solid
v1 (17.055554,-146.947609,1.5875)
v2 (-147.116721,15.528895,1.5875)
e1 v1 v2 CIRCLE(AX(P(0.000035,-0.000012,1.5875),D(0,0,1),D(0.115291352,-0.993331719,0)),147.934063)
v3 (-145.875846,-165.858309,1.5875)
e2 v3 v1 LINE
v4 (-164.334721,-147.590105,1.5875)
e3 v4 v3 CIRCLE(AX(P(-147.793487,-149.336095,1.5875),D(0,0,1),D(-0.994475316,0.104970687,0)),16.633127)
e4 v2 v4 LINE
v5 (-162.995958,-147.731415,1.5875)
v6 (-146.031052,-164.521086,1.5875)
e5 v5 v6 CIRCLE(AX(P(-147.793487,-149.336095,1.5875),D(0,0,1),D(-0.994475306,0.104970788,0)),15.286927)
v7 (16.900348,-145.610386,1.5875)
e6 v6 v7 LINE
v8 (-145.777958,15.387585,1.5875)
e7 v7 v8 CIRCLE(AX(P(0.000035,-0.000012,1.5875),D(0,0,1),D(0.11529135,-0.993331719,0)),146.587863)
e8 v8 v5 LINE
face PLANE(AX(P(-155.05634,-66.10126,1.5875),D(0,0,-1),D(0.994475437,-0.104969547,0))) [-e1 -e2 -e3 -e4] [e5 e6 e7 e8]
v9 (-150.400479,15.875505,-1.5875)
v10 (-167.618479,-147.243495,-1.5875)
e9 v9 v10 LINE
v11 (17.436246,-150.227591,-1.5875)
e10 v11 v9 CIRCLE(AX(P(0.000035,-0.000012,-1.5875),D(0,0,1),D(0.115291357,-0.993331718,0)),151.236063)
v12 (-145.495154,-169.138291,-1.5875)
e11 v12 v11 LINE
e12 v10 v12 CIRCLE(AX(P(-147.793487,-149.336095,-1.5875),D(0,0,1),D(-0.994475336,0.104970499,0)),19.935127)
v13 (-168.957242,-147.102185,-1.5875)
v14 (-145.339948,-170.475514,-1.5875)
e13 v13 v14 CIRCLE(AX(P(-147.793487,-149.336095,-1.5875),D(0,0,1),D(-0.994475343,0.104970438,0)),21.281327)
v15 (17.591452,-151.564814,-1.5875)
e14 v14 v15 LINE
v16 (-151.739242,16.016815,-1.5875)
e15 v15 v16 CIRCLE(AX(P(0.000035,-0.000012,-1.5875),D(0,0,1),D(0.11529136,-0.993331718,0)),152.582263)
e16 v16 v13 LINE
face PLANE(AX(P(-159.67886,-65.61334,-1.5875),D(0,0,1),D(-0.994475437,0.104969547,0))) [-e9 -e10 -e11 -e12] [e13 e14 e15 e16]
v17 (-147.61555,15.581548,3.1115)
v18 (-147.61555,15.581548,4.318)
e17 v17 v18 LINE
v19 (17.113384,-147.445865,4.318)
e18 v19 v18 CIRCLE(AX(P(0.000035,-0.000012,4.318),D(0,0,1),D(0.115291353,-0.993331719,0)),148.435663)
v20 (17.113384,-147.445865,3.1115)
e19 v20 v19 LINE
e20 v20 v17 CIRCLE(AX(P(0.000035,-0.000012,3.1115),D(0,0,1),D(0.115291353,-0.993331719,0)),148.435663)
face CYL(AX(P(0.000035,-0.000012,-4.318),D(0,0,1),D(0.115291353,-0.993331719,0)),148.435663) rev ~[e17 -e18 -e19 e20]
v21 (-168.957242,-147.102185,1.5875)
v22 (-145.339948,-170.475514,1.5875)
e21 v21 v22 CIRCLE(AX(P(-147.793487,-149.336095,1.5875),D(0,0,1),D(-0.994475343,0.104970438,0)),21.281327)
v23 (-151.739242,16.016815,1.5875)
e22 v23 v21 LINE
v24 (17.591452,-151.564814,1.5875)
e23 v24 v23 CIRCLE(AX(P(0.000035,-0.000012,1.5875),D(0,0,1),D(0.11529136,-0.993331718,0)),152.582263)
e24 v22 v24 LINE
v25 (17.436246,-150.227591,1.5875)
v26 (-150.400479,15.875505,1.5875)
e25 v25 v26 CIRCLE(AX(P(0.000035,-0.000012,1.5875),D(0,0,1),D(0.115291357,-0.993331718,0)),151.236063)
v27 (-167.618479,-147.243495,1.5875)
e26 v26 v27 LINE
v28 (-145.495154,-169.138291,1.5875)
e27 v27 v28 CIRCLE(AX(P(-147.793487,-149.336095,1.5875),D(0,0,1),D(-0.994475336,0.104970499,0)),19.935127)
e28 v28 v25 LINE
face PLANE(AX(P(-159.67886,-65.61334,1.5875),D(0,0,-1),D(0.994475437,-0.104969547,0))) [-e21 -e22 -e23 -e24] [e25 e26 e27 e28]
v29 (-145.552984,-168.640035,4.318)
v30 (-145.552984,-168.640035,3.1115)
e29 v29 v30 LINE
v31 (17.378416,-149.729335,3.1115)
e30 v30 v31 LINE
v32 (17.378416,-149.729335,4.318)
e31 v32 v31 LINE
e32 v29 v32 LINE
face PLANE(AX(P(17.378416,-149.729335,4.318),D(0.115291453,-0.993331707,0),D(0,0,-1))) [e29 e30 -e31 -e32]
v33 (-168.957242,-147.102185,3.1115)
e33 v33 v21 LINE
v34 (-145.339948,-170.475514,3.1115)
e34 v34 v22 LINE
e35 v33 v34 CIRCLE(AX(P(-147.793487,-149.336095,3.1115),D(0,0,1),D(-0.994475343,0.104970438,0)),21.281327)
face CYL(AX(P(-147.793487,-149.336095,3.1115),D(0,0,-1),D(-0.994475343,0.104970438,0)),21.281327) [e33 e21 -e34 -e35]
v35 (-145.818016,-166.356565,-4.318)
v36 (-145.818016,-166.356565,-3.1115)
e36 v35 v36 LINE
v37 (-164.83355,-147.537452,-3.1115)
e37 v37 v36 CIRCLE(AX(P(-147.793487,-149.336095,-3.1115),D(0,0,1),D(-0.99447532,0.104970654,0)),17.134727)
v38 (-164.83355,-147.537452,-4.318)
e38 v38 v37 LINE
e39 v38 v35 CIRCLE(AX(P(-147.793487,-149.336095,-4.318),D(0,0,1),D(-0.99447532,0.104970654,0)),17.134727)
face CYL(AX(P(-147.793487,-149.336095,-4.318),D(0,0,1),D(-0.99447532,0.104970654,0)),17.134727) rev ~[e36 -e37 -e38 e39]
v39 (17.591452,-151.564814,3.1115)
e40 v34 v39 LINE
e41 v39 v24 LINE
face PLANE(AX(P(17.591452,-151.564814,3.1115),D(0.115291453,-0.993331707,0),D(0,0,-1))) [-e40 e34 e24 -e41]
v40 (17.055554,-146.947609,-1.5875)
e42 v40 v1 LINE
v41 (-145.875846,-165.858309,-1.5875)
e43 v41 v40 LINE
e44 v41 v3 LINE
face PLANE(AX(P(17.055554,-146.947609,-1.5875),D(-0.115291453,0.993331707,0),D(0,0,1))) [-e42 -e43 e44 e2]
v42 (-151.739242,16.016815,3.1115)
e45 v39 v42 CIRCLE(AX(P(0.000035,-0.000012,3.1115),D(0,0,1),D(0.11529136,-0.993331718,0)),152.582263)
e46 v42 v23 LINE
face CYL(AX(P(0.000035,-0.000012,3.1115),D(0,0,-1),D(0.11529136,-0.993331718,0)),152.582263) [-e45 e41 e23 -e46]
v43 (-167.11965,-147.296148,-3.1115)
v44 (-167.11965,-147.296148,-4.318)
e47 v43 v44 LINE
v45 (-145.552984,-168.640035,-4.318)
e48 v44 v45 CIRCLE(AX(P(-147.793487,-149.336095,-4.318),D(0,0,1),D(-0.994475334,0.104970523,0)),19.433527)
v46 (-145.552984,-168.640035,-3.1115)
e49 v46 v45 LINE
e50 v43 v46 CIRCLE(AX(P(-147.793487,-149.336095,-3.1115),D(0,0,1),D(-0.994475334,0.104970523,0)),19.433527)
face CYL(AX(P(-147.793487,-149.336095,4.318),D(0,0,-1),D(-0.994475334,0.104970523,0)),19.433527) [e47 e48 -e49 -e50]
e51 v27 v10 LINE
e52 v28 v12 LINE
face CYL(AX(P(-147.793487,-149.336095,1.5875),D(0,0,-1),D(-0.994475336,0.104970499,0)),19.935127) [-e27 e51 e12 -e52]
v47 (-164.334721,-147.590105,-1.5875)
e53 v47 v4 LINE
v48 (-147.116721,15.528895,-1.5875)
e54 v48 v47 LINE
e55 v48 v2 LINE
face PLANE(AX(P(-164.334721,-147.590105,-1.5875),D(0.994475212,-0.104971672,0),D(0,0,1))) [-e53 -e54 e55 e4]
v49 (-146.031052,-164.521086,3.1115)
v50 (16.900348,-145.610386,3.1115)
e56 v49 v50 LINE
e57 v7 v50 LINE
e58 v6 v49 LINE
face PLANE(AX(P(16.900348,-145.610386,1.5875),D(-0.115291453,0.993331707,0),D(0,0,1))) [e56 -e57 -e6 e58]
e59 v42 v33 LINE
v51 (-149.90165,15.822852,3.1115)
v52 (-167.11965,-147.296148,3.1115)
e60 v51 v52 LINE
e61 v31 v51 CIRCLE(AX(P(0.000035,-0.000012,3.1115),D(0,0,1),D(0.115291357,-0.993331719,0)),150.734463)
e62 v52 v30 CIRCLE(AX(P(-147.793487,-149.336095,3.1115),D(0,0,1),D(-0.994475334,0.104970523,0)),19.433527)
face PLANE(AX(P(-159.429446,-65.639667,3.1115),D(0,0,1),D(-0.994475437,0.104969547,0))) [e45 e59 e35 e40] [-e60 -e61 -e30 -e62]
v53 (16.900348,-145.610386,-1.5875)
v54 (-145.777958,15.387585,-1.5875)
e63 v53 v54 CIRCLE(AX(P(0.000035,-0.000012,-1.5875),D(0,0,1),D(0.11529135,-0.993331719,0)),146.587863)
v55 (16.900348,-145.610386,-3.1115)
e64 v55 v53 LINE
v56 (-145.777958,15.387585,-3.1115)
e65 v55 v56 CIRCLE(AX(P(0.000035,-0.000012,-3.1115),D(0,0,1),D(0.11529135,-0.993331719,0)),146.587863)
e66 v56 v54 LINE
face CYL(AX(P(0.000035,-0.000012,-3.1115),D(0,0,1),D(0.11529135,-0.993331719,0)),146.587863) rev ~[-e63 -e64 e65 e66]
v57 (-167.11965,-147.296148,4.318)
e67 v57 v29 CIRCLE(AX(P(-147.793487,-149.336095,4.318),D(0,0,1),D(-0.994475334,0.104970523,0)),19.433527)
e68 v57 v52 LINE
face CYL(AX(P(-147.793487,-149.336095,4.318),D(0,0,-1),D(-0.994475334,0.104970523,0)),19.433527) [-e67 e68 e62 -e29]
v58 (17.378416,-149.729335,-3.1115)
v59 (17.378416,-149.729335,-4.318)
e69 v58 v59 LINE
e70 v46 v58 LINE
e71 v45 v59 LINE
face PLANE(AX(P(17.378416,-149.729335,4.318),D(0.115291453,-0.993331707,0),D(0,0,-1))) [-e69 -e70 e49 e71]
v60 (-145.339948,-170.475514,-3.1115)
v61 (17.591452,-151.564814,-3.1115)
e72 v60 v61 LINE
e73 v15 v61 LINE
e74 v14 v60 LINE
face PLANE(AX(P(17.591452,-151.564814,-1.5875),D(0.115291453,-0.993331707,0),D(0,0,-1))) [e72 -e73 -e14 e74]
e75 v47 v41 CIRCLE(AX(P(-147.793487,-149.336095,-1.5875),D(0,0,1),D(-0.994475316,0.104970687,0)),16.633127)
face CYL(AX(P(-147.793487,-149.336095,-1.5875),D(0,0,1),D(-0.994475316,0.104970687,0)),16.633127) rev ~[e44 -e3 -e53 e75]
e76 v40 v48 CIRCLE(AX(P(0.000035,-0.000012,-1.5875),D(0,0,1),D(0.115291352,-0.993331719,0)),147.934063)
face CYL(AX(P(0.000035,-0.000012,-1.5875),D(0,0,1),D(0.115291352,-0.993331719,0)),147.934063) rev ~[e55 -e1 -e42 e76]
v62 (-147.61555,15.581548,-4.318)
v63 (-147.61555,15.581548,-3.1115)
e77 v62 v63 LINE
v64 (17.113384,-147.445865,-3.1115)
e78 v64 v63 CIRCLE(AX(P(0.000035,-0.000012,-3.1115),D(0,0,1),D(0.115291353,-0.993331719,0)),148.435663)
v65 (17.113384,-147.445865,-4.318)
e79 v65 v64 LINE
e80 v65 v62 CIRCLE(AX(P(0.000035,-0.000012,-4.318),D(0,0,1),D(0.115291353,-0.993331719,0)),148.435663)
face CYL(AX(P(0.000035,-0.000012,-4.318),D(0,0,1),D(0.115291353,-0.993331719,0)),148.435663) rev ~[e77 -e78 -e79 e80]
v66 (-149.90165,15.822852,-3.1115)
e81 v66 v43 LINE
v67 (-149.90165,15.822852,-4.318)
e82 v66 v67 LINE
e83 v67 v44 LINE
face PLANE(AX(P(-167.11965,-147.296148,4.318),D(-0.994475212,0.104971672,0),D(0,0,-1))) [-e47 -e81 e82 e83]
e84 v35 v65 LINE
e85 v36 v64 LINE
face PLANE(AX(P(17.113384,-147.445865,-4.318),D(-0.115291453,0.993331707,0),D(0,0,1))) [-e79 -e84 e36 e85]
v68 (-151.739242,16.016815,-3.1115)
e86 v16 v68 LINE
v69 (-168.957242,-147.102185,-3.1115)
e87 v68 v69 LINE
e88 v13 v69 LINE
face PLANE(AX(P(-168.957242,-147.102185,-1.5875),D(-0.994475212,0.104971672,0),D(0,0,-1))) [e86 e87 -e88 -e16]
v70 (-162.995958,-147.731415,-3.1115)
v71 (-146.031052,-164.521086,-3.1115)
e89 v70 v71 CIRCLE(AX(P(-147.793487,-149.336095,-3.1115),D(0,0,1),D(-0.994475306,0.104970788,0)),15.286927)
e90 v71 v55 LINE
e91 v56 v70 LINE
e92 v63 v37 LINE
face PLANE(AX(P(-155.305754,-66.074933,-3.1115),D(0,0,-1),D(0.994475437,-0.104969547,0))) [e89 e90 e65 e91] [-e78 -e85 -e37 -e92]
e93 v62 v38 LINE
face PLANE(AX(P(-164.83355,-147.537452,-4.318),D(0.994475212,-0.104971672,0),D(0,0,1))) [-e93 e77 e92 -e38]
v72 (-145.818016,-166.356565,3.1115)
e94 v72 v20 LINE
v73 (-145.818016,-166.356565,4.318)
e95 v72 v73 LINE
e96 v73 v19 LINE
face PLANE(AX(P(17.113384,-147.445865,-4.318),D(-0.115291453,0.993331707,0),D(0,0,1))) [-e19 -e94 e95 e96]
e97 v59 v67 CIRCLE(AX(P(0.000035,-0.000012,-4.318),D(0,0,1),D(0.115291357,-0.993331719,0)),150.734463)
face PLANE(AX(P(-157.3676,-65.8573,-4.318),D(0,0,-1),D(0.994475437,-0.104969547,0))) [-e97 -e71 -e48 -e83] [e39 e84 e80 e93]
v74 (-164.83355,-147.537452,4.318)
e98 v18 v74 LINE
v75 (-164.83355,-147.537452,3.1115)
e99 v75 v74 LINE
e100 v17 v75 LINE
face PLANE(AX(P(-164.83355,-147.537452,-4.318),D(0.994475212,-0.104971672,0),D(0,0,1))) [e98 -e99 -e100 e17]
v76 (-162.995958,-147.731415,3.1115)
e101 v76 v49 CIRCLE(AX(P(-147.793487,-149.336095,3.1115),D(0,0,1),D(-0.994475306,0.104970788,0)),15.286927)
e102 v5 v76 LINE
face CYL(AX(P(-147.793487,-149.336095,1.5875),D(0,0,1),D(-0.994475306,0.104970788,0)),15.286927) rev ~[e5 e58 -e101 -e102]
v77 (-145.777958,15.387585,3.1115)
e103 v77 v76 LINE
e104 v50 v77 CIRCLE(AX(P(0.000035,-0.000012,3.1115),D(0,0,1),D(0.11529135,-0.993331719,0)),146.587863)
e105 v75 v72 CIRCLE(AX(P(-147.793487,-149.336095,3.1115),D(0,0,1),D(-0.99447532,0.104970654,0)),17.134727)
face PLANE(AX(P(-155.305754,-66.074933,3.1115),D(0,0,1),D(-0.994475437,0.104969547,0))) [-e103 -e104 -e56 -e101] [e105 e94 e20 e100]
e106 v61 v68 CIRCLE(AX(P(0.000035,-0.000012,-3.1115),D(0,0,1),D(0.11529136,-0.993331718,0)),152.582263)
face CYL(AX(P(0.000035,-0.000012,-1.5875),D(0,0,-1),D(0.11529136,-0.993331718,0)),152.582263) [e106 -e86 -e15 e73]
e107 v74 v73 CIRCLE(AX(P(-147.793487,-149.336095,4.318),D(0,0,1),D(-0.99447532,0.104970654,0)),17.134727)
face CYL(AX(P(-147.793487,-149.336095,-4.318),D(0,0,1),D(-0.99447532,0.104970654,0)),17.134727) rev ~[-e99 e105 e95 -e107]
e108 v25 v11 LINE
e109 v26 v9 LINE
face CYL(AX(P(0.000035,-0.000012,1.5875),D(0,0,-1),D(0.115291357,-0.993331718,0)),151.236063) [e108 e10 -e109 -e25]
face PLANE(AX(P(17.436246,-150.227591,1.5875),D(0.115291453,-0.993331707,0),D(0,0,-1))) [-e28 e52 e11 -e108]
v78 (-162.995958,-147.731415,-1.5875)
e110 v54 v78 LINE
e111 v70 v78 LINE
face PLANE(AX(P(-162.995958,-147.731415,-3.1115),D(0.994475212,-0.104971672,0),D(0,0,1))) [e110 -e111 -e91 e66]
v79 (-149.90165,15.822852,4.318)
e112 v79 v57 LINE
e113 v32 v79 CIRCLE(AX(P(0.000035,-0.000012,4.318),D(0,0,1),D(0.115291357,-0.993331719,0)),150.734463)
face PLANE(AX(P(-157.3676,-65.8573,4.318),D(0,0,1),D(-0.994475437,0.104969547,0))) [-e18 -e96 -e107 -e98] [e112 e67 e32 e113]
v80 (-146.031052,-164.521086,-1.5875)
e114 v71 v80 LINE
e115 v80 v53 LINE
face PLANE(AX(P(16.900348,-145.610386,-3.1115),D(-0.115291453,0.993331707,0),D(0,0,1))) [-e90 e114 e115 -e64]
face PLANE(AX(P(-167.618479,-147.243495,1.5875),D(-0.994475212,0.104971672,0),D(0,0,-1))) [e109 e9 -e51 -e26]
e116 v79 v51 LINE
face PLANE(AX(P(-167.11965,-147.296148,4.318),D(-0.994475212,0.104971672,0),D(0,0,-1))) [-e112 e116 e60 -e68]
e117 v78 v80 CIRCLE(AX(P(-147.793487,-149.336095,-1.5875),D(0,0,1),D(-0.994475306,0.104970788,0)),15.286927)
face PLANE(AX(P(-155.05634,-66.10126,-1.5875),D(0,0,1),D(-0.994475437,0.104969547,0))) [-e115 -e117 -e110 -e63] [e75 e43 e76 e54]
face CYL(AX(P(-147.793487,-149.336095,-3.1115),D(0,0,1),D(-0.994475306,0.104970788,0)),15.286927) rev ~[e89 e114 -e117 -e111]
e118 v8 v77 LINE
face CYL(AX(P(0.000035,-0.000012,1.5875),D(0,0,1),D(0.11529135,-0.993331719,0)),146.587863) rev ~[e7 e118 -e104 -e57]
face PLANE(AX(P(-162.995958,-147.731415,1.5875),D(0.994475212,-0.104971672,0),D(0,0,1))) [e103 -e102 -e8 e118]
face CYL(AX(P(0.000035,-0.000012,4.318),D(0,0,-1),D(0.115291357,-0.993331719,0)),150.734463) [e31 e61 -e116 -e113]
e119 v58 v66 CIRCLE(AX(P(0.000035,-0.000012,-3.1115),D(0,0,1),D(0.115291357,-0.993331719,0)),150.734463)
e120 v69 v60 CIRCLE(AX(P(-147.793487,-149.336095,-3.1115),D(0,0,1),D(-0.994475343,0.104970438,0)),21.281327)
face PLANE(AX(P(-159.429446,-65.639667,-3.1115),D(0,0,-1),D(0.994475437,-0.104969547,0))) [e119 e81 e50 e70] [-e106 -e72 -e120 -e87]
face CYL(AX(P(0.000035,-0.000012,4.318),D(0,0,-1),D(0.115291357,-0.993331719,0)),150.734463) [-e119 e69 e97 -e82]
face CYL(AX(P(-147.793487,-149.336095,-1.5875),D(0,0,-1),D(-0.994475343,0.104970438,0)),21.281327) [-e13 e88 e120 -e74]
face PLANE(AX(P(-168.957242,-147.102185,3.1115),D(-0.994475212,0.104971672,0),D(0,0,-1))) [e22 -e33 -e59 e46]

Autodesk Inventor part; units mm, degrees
ref_plane "Work Plane2" through (-147.7935, -149.3361, 0) normal (-1, 0, 0) x (0, 0, 1)
ref_plane "Work Plane3" through (0, 0, 0) normal (-0.1204975, -0.9927136, 0) x (0, 0, 1)
sketch "Path" plane through (0, 0, 0) normal (0, 0, 1) x (1, 0, 0)
  arc A0 (-165.9766, -147.4168) -> (-145.6855, -167.4983) centre (-147.7935, -149.3361) ccw
  arc A1 (17.2459, -148.5876) -> (-148.7586, 15.7022) centre (0, 0) ccw
  line L0 (17.2459, -148.5876) -> (-145.6855, -167.4983)
  line L1 (-165.9766, -147.4168) -> (-148.7586, 15.7022)
  dimension "d31" = 5.9944
ref_plane "Section Plane" through (-145.6855, -167.4983, 0) normal (0.9933317, 0.1152916, 0) x (0, 0, 1)
sketch "Section Sketch" plane through (-145.6855, -167.4983, 0) normal (0.9933317, 0.1152916, 0) x (0, 0, 1)
  line L0 (-4.318, -1.1494) -> (4.318, -1.1494)
  line L1 (4.318, -1.1494) -> (4.318, 1.1494)
  line L2 (4.318, 1.1494) -> (-4.318, 1.1494)
  line L3 (-4.318, 1.1494) -> (-4.318, -1.1494)
  line L4 (-1.5875, -1.651) -> (1.5875, -1.651)
  line L5 (1.5875, -1.651) -> (1.5875, 1.651)
  line L6 (1.5875, 1.651) -> (-1.5875, 1.651)
  line L7 (-1.5875, 1.651) -> (-1.5875, -1.651)
  line L8 (-1.5875, 0) -> (1.5875, 0) construction
  line L9 (-3.1115, -2.9972) -> (-1.5875, -2.9972)
  line L10 (-1.5875, -2.9972) -> (-1.5875, 2.9972)
  line L11 (-1.5875, 2.9972) -> (-3.1115, 2.9972)
  line L12 (-3.1115, 2.9972) -> (-3.1115, -2.9972)
  line L13 (1.5875, -2.9972) -> (3.1115, -2.9972)
  line L14 (3.1115, -2.9972) -> (3.1115, 2.9972)
  line L15 (3.1115, 2.9972) -> (1.5875, 2.9972)
  line L16 (1.5875, 2.9972) -> (1.5875, -2.9972)
  line L17 (-4.318, 0) -> (4.318, 0) construction
  point P0 (0, 0)
  point P1 (0, 0)
  dimension "d21" = 2.2987
  dimension "d22" = 3.302
  dimension "d23" = 3.175
  dimension "d24" = 1.524
  dimension "d31" = 5.9944
  dimension "d32" = 8.636
sweep "Solid" add profiles "Section Sketch" path "Path"
pattern_of_one "Strand Pattern"
equation "\"d21\" = da_d2"
equation "\"d22\" = da_d1"
equation "\"d23\" = da_b1"
equation "\"d24\" = da_t1 + da_t2"
equation "\"d30\" = da_pt"
equation "\"da_p\" = 6.35"
equation "\"da_b1\" = 3.175"
equation "\"da_h2\" = 5.9944"
equation "\"da_h3\" = 5.207"
equation "\"da_d1\" = 3.302"
equation "\"da_d2\" = 2.2987"
equation "\"da_pt\" = 6.4008"
equation "\"da_b\" = 8.636"
equation "\"da_t1\" = 0.762"
equation "\"da_t2\" = 0.762"
properties part number "Roller Chain"
